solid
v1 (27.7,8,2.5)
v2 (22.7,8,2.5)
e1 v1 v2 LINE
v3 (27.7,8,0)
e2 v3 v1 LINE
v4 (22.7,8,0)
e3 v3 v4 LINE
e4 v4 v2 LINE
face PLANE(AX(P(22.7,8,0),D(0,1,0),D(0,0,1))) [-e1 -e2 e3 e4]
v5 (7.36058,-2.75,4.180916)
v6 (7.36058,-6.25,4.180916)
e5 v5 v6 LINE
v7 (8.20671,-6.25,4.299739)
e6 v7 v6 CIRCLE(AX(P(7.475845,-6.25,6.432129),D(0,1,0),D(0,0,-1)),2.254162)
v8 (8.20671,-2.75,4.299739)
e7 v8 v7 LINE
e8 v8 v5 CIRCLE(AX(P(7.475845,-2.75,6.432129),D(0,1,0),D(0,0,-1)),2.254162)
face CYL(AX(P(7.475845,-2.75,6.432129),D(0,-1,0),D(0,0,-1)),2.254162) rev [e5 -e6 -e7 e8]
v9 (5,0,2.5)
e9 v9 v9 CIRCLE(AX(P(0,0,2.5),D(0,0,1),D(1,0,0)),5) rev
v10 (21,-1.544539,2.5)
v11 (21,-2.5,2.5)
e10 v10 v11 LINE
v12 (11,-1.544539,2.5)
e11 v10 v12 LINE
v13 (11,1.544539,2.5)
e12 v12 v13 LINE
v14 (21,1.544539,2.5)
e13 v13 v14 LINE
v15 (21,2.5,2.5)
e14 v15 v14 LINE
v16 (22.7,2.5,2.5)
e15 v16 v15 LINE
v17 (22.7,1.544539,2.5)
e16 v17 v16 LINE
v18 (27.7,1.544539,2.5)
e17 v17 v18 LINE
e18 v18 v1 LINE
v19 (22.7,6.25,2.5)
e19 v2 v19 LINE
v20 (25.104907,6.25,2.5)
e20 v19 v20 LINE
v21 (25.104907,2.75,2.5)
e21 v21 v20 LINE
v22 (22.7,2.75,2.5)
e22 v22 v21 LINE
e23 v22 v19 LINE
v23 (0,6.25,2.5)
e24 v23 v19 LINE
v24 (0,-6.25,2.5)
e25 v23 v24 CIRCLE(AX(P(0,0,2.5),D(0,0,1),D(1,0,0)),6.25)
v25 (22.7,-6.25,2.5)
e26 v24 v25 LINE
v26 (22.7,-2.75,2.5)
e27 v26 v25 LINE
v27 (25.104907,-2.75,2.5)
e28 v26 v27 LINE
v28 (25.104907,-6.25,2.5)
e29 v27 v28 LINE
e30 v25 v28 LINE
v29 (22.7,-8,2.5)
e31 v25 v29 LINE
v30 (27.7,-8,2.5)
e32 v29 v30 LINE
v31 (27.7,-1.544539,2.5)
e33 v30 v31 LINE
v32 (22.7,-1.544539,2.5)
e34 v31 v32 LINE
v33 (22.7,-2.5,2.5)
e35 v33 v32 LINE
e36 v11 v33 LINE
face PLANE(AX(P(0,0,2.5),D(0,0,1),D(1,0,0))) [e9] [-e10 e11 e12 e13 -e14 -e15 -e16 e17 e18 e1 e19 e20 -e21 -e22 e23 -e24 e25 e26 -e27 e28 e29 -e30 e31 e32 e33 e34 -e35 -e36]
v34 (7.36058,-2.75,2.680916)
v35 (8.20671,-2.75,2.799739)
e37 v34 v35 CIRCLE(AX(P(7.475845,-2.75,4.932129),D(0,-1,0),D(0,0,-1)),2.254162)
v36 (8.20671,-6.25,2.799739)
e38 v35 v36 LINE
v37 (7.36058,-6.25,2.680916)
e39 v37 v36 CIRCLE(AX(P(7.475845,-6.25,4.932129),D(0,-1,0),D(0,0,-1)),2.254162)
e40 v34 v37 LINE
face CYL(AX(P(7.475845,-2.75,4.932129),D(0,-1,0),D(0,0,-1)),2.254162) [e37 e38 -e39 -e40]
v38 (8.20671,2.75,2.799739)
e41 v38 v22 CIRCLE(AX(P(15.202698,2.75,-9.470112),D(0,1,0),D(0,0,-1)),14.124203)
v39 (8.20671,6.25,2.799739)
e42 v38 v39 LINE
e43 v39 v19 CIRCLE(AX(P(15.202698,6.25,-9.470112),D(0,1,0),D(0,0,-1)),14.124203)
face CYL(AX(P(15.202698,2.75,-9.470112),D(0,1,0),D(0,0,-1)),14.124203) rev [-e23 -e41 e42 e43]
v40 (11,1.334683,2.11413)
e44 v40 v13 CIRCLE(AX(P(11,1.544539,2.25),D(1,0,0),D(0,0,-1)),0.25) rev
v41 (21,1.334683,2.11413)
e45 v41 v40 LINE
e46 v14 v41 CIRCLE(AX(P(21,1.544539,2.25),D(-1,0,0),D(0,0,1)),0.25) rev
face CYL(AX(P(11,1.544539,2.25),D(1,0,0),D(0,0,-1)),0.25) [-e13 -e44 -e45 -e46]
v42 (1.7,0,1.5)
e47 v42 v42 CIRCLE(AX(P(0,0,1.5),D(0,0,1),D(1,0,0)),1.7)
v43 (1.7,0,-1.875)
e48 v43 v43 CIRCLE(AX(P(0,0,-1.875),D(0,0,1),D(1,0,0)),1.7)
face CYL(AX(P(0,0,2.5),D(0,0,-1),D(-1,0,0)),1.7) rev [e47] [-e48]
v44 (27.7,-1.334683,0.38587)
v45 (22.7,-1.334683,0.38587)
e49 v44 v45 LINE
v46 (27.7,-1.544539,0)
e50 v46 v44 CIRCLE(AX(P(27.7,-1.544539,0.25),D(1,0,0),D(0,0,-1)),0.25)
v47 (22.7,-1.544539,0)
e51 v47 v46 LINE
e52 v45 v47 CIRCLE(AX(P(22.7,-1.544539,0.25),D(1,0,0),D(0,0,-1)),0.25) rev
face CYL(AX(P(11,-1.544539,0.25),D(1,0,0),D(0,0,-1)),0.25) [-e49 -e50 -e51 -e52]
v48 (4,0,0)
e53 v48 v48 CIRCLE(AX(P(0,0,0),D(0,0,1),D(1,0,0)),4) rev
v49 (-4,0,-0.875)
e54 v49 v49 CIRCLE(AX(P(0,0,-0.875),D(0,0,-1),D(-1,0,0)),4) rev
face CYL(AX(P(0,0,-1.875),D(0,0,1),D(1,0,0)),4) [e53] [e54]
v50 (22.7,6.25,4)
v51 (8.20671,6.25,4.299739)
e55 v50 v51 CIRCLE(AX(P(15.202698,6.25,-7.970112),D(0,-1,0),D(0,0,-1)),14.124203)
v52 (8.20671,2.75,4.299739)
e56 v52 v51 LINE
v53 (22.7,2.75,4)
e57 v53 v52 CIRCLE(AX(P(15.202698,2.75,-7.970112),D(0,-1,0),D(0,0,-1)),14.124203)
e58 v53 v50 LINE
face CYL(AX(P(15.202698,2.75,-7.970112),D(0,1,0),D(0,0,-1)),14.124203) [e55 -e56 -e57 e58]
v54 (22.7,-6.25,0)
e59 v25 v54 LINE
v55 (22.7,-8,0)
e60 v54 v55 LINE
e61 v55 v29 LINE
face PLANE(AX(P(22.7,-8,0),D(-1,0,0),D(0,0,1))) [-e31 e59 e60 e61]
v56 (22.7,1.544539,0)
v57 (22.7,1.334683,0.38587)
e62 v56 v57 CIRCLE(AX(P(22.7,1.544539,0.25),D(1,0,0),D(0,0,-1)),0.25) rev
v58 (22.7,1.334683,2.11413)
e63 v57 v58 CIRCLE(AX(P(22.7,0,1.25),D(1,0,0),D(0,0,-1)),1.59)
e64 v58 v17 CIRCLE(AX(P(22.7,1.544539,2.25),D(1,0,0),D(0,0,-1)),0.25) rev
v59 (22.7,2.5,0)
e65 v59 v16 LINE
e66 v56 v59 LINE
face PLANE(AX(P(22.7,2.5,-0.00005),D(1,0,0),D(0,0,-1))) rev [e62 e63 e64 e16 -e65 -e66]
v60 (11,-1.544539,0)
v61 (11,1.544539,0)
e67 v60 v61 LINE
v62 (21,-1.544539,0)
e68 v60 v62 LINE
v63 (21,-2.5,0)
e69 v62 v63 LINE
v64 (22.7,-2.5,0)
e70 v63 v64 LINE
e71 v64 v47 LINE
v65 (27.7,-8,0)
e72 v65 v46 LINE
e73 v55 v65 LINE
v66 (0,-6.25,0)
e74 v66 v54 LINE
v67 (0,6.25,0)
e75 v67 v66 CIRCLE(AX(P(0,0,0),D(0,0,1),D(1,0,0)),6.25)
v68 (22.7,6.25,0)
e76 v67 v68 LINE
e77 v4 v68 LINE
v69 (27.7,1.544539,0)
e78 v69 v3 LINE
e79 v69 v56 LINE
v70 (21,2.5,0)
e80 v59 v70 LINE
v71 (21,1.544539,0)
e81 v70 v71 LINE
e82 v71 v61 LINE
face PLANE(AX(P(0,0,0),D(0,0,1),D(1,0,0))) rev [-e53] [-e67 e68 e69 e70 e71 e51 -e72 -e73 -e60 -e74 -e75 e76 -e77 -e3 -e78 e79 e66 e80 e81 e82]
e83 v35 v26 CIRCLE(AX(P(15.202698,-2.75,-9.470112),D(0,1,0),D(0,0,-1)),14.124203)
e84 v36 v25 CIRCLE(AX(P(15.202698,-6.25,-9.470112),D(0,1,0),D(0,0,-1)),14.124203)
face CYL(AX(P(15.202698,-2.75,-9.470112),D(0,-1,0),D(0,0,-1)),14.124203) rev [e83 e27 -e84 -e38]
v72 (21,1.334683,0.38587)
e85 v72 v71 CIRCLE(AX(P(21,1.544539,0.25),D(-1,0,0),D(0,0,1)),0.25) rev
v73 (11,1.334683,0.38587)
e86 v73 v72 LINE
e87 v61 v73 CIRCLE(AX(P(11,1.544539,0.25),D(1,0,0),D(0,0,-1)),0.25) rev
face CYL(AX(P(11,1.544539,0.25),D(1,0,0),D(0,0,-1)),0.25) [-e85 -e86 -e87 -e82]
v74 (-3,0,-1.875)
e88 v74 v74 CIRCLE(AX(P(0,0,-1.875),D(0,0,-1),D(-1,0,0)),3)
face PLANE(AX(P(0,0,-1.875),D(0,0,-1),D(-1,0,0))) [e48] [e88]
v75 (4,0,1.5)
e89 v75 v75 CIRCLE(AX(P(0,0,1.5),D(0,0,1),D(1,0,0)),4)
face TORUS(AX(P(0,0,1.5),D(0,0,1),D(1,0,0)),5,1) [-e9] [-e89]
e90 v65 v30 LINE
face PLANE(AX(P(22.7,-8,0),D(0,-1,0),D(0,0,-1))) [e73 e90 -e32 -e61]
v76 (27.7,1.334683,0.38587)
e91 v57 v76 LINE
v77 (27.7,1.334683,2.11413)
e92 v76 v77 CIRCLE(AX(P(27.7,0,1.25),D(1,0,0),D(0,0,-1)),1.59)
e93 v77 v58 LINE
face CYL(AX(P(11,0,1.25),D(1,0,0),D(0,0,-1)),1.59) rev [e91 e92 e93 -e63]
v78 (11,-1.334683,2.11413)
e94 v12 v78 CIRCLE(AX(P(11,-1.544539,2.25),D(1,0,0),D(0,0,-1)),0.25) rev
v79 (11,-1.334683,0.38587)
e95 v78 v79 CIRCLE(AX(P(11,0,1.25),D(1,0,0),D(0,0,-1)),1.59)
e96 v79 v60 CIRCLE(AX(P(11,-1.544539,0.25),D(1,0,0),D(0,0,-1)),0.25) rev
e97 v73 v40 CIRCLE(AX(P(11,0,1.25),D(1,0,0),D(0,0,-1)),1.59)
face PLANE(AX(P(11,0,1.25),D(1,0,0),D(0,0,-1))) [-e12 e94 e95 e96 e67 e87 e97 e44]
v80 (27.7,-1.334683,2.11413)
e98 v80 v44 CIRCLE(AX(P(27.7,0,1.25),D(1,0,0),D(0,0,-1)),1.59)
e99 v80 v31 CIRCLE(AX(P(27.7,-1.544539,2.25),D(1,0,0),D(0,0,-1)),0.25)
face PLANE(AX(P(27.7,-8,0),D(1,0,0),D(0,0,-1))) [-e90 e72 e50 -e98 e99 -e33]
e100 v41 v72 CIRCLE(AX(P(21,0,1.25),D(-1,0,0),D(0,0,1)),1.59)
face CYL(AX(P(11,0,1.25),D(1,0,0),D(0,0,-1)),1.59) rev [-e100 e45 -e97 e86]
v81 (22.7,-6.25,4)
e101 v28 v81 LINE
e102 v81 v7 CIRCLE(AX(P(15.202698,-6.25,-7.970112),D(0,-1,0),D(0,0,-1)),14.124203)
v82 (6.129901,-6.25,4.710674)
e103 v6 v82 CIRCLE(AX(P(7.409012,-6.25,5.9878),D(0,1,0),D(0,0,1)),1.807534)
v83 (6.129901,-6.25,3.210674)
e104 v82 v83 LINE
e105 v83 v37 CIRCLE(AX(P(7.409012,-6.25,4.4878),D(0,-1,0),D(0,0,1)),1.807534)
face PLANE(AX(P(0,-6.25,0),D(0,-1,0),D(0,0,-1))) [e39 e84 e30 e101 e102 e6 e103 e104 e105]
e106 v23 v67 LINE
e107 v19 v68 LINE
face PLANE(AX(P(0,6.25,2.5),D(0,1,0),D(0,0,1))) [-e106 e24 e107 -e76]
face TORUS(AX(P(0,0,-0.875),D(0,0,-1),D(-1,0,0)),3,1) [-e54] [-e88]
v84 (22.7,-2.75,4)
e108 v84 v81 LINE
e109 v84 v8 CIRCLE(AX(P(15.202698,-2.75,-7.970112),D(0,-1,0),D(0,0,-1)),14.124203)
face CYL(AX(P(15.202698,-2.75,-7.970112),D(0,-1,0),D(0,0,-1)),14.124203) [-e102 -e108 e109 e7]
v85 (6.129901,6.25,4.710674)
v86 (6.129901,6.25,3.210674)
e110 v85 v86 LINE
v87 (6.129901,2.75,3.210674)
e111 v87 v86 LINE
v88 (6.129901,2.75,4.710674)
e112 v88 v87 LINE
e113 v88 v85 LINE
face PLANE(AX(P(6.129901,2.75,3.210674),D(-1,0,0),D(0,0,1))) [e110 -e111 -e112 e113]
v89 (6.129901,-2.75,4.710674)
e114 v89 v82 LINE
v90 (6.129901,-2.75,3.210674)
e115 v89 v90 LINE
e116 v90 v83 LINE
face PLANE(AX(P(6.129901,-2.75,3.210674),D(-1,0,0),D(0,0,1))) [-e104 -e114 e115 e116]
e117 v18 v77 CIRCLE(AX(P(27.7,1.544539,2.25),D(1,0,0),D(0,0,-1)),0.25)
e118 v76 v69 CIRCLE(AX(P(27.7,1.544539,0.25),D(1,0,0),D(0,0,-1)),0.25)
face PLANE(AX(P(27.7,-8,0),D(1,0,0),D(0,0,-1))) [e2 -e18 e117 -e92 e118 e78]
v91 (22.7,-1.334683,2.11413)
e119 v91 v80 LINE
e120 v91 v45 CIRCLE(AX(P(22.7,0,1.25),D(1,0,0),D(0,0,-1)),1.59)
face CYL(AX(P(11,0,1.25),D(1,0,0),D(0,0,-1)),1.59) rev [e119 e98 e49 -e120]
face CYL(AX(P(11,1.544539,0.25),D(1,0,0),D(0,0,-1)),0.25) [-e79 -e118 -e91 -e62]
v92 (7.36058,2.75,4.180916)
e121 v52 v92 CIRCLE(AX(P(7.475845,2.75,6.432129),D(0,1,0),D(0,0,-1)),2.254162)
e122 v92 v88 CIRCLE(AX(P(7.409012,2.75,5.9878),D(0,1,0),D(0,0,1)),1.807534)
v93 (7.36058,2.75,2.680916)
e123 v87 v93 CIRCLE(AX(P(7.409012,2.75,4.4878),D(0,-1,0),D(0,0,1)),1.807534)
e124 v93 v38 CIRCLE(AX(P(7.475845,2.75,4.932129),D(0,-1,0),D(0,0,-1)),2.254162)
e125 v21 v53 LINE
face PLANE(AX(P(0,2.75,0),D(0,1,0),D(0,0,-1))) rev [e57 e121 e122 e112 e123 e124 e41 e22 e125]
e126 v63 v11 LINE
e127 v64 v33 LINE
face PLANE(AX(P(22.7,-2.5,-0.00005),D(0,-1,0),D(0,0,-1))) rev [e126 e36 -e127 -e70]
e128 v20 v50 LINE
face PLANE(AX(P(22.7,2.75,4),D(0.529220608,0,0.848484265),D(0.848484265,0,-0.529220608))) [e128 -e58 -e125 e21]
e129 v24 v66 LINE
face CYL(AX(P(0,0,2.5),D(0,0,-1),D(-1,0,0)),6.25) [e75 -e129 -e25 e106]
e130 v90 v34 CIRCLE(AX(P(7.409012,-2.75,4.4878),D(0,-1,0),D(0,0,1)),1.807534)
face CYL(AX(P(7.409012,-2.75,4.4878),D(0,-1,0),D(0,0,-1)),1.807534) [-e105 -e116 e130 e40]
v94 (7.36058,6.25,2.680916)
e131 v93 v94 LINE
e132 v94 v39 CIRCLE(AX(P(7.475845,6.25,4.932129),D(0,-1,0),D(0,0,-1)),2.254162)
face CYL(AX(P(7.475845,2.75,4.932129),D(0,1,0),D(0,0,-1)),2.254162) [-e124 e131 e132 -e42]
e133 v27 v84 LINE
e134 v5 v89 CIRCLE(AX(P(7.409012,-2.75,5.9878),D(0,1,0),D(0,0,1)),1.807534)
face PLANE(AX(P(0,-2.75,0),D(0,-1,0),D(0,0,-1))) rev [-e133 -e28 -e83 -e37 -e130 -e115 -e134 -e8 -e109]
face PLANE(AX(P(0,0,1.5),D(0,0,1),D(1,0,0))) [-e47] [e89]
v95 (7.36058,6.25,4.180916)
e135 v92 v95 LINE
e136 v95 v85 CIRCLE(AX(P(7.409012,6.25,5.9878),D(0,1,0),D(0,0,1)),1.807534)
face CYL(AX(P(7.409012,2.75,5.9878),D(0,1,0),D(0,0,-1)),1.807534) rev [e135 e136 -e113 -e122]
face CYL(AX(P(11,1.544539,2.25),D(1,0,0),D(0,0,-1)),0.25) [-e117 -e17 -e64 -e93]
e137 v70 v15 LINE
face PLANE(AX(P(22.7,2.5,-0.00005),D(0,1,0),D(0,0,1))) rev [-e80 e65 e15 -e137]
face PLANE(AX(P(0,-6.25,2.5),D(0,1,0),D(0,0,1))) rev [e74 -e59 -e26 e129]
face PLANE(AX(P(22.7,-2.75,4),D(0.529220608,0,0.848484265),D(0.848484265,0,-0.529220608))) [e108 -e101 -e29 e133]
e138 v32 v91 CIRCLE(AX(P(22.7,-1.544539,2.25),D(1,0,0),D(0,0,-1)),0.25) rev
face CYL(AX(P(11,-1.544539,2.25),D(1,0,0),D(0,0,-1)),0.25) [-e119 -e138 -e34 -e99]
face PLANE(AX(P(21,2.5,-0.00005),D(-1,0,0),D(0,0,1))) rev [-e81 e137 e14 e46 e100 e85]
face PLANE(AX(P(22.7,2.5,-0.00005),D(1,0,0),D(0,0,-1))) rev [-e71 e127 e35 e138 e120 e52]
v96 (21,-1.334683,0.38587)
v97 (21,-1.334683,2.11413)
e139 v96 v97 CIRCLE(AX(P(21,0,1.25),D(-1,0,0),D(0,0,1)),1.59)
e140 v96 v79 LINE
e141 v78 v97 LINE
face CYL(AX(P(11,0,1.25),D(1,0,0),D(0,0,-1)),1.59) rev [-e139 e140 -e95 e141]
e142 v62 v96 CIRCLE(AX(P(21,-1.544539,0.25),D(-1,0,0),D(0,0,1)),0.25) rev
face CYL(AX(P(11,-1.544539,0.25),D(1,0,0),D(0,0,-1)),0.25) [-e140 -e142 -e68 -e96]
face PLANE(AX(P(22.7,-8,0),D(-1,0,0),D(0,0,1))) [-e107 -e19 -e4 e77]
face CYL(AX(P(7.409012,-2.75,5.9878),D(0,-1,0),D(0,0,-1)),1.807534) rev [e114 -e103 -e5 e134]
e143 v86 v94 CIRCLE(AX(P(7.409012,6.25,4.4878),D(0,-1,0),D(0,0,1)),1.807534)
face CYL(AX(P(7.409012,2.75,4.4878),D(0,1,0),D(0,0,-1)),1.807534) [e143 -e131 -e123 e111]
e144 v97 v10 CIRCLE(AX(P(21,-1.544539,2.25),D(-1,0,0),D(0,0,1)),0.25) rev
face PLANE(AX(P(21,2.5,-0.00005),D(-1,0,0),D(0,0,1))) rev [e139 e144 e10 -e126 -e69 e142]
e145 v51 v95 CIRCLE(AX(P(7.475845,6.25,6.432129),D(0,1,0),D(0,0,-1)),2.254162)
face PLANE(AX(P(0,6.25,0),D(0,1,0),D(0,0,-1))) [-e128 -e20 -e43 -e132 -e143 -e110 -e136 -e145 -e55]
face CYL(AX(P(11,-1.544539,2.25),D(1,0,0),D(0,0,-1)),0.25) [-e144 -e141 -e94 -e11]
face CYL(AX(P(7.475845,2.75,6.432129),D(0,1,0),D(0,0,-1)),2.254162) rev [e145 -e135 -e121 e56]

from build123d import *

# Parameters (mm, degrees)
SKETCH1_R           = 1.7
SKETCH1_W           = 10
SKETCH1_H           = 12.5
BOSS_EXTRUDE1_DEPTH = 2.5
SKETCH2_W           = 5
SKETCH2_H           = 16
BOSS_EXTRUDE2_DEPTH = 2.5
SKETCH3_W           = 1.7
SKETCH3_H           = 5
CUT_EXTRUDE1_DEPTH  = 29.940283343
SKETCH6_R           = 1.59
CUT_EXTRUDE3_DEPTH  = 16.7
BOSS_EXTRUDE3_DEPTH = 3.5
BOSS_EXTRUDE5_DEPTH = 3.5
SKETCH10_R          = 4
BOSS_EXTRUDE6_DEPTH = 1.875
SKETCH11_R          = 1.7
CUT_EXTRUDE4_DEPTH  = 30.481567746
SKETCH12_R          = 4
CUT_EXTRUDE5_DEPTH  = 1
FILLET1_R           = 1
FILLET2_R           = 1
FILLET3_R           = 0.25
FILLET4_R           = 0.25


with BuildPart() as part:
    # Sketch1 → Boss-Extrude1 (new body)
    # profile 1 of 2: a face of its own
    with BuildSketch(Plane.XY):
        with BuildLine():
            ThreePointArc((0, 6.25), (-6.25, 0), (0, -6.25))
            Line((0, -6.25), (12.7, -6.25))
            Line((12.7, -6.25), (12.7, 6.25))
            Line((12.7, 6.25), (0, 6.25))
        make_face()
        Circle(SKETCH1_R, mode=Mode.SUBTRACT)
    # profile 2 of 2: a face of its own
    with BuildSketch(Plane.XY):
        with Locations((17.7, 0)):
            Rectangle(SKETCH1_W, SKETCH1_H)
    extrude(amount=BOSS_EXTRUDE1_DEPTH)

    # Sketch2 → Boss-Extrude2 (add)
    with BuildSketch(Plane.XY.offset(2.5)):
        with Locations((25.2, 0)):
            Rectangle(SKETCH2_W, SKETCH2_H)
    extrude(amount=-BOSS_EXTRUDE2_DEPTH)

    # Sketch3 → Cut-Extrude1 (cut, through all)
    with BuildSketch(Plane.XY.offset(2.5)):
        with Locations((21.85, 0)):
            Rectangle(SKETCH3_W, SKETCH3_H)
    extrude(amount=-CUT_EXTRUDE1_DEPTH, mode=Mode.SUBTRACT)

    # Sketch6 → Cut-Extrude3 (cut)
    with BuildSketch(Plane(origin=(27.7, 0, 0), x_dir=(0, 0, -1), z_dir=(1, 0, 0))):
        with Locations((-1.25, 0)):
            Circle(SKETCH6_R)
    extrude(amount=-CUT_EXTRUDE3_DEPTH, mode=Mode.SUBTRACT)


with BuildPart() as body_2:
    # Sketch7 → Boss-Extrude3 (new body)
    with BuildSketch(Plane.XZ.offset(6.25)):
        with BuildLine():
            Line((6.129900512, 3.210673711), (6.129900512, 4.710673711))
            ThreePointArc((6.129900512, 4.710673711), (6.694341527, 4.327552018), (7.360579964, 4.180915603))
            ThreePointArc((7.360579964, 4.180915603), (7.789326283, 4.199870579), (8.206709695, 4.299739418))
            ThreePointArc((8.206709695, 4.299739418), (15.494742209, 6.151071465), (22.7, 4))
            Line((22.7, 4), (22.7, 2.5))
            ThreePointArc((22.7, 2.5), (15.494742209, 4.651071465), (8.206709695, 2.799739418))
            ThreePointArc((8.206709695, 2.799739418), (7.789326283, 2.699870579), (7.360579964, 2.680915603))
            ThreePointArc((7.360579964, 2.680915603), (6.694341527, 2.827552018), (6.129900512, 3.210673711))
        make_face()
    extrude(amount=-BOSS_EXTRUDE3_DEPTH)


with BuildPart() as body_3:
    # Sketch9 → Boss-Extrude5 (new body)
    with BuildSketch(Plane.XZ.offset(6.25)):
        Polygon((22.7, 4), (25.104907101, 2.5), (22.7, 2.5), align=None)
    extrude(amount=-BOSS_EXTRUDE5_DEPTH)

    # Combine1: union body 2
    add(body_2.part)


with BuildPart() as body_3_2:
    # Mirror5: mirrored copy
    add(body_3.part.mirror(Plane(origin=(0, 0, 0), x_dir=(0, 0, 1), z_dir=(0, -1, 0))))


with BuildPart() as part_1:
    add(part.part)

    # Combine4: union body 3, body 3 2
    add(body_3.part)
    add(body_3_2.part)

    # Sketch10 → Boss-Extrude6 (add)
    with BuildSketch(Plane(origin=(0, 0, 0), x_dir=(-1, 0, 0), z_dir=(0, 0, -1))):
        with Locations(Location((0, 0, 0), (0, 0, 180))):
            Circle(SKETCH10_R)
    extrude(amount=BOSS_EXTRUDE6_DEPTH)

    # Sketch11 → Cut-Extrude4 (cut, through all)
    with BuildSketch(Plane.XY):
        Circle(SKETCH11_R)
    extrude(amount=-CUT_EXTRUDE4_DEPTH, mode=Mode.SUBTRACT)

    # Sketch12 → Cut-Extrude5 (cut)
    with BuildSketch(Plane.XY.offset(2.5)):
        Circle(SKETCH12_R)
    extrude(amount=-CUT_EXTRUDE5_DEPTH, mode=Mode.SUBTRACT)

    # Fillet1
    fillet1_edges = [part_1.edges().sort_by_distance(p)[0] for p in [
        (-4, 0, 2.5),
    ]]
    fillet(fillet1_edges, radius=FILLET1_R - 0.0001)  # a hair under: the kernel refuses the full size

    # Fillet2
    fillet2_edges = [part_1.edges().sort_by_distance(p)[0] for p in [
        (-4, 0, -1.875),
    ]]
    fillet(fillet2_edges, radius=FILLET2_R)

    # Fillet3
    fillet3_edges = [part_1.edges().sort_by_distance(p)[0] for p in [
        (16, 0.98264948, 2.5),
        (16, -0.98264948, 2.5),
        (16, 0.98264948, 0),
        (16, -0.98264948, 0),
    ]]
    fillet(fillet3_edges, radius=FILLET3_R)

    # Fillet4
    fillet4_edges = [part_1.edges().sort_by_distance(p)[0] for p in [
        (25.2, 0.98264948, 2.5),
        (25.2, -0.98264948, 2.5),
        (25.2, 0.98264948, 0),
        (25.2, -0.98264948, 0),
    ]]
    fillet(fillet4_edges, radius=FILLET4_R)


solid = part_1.part
